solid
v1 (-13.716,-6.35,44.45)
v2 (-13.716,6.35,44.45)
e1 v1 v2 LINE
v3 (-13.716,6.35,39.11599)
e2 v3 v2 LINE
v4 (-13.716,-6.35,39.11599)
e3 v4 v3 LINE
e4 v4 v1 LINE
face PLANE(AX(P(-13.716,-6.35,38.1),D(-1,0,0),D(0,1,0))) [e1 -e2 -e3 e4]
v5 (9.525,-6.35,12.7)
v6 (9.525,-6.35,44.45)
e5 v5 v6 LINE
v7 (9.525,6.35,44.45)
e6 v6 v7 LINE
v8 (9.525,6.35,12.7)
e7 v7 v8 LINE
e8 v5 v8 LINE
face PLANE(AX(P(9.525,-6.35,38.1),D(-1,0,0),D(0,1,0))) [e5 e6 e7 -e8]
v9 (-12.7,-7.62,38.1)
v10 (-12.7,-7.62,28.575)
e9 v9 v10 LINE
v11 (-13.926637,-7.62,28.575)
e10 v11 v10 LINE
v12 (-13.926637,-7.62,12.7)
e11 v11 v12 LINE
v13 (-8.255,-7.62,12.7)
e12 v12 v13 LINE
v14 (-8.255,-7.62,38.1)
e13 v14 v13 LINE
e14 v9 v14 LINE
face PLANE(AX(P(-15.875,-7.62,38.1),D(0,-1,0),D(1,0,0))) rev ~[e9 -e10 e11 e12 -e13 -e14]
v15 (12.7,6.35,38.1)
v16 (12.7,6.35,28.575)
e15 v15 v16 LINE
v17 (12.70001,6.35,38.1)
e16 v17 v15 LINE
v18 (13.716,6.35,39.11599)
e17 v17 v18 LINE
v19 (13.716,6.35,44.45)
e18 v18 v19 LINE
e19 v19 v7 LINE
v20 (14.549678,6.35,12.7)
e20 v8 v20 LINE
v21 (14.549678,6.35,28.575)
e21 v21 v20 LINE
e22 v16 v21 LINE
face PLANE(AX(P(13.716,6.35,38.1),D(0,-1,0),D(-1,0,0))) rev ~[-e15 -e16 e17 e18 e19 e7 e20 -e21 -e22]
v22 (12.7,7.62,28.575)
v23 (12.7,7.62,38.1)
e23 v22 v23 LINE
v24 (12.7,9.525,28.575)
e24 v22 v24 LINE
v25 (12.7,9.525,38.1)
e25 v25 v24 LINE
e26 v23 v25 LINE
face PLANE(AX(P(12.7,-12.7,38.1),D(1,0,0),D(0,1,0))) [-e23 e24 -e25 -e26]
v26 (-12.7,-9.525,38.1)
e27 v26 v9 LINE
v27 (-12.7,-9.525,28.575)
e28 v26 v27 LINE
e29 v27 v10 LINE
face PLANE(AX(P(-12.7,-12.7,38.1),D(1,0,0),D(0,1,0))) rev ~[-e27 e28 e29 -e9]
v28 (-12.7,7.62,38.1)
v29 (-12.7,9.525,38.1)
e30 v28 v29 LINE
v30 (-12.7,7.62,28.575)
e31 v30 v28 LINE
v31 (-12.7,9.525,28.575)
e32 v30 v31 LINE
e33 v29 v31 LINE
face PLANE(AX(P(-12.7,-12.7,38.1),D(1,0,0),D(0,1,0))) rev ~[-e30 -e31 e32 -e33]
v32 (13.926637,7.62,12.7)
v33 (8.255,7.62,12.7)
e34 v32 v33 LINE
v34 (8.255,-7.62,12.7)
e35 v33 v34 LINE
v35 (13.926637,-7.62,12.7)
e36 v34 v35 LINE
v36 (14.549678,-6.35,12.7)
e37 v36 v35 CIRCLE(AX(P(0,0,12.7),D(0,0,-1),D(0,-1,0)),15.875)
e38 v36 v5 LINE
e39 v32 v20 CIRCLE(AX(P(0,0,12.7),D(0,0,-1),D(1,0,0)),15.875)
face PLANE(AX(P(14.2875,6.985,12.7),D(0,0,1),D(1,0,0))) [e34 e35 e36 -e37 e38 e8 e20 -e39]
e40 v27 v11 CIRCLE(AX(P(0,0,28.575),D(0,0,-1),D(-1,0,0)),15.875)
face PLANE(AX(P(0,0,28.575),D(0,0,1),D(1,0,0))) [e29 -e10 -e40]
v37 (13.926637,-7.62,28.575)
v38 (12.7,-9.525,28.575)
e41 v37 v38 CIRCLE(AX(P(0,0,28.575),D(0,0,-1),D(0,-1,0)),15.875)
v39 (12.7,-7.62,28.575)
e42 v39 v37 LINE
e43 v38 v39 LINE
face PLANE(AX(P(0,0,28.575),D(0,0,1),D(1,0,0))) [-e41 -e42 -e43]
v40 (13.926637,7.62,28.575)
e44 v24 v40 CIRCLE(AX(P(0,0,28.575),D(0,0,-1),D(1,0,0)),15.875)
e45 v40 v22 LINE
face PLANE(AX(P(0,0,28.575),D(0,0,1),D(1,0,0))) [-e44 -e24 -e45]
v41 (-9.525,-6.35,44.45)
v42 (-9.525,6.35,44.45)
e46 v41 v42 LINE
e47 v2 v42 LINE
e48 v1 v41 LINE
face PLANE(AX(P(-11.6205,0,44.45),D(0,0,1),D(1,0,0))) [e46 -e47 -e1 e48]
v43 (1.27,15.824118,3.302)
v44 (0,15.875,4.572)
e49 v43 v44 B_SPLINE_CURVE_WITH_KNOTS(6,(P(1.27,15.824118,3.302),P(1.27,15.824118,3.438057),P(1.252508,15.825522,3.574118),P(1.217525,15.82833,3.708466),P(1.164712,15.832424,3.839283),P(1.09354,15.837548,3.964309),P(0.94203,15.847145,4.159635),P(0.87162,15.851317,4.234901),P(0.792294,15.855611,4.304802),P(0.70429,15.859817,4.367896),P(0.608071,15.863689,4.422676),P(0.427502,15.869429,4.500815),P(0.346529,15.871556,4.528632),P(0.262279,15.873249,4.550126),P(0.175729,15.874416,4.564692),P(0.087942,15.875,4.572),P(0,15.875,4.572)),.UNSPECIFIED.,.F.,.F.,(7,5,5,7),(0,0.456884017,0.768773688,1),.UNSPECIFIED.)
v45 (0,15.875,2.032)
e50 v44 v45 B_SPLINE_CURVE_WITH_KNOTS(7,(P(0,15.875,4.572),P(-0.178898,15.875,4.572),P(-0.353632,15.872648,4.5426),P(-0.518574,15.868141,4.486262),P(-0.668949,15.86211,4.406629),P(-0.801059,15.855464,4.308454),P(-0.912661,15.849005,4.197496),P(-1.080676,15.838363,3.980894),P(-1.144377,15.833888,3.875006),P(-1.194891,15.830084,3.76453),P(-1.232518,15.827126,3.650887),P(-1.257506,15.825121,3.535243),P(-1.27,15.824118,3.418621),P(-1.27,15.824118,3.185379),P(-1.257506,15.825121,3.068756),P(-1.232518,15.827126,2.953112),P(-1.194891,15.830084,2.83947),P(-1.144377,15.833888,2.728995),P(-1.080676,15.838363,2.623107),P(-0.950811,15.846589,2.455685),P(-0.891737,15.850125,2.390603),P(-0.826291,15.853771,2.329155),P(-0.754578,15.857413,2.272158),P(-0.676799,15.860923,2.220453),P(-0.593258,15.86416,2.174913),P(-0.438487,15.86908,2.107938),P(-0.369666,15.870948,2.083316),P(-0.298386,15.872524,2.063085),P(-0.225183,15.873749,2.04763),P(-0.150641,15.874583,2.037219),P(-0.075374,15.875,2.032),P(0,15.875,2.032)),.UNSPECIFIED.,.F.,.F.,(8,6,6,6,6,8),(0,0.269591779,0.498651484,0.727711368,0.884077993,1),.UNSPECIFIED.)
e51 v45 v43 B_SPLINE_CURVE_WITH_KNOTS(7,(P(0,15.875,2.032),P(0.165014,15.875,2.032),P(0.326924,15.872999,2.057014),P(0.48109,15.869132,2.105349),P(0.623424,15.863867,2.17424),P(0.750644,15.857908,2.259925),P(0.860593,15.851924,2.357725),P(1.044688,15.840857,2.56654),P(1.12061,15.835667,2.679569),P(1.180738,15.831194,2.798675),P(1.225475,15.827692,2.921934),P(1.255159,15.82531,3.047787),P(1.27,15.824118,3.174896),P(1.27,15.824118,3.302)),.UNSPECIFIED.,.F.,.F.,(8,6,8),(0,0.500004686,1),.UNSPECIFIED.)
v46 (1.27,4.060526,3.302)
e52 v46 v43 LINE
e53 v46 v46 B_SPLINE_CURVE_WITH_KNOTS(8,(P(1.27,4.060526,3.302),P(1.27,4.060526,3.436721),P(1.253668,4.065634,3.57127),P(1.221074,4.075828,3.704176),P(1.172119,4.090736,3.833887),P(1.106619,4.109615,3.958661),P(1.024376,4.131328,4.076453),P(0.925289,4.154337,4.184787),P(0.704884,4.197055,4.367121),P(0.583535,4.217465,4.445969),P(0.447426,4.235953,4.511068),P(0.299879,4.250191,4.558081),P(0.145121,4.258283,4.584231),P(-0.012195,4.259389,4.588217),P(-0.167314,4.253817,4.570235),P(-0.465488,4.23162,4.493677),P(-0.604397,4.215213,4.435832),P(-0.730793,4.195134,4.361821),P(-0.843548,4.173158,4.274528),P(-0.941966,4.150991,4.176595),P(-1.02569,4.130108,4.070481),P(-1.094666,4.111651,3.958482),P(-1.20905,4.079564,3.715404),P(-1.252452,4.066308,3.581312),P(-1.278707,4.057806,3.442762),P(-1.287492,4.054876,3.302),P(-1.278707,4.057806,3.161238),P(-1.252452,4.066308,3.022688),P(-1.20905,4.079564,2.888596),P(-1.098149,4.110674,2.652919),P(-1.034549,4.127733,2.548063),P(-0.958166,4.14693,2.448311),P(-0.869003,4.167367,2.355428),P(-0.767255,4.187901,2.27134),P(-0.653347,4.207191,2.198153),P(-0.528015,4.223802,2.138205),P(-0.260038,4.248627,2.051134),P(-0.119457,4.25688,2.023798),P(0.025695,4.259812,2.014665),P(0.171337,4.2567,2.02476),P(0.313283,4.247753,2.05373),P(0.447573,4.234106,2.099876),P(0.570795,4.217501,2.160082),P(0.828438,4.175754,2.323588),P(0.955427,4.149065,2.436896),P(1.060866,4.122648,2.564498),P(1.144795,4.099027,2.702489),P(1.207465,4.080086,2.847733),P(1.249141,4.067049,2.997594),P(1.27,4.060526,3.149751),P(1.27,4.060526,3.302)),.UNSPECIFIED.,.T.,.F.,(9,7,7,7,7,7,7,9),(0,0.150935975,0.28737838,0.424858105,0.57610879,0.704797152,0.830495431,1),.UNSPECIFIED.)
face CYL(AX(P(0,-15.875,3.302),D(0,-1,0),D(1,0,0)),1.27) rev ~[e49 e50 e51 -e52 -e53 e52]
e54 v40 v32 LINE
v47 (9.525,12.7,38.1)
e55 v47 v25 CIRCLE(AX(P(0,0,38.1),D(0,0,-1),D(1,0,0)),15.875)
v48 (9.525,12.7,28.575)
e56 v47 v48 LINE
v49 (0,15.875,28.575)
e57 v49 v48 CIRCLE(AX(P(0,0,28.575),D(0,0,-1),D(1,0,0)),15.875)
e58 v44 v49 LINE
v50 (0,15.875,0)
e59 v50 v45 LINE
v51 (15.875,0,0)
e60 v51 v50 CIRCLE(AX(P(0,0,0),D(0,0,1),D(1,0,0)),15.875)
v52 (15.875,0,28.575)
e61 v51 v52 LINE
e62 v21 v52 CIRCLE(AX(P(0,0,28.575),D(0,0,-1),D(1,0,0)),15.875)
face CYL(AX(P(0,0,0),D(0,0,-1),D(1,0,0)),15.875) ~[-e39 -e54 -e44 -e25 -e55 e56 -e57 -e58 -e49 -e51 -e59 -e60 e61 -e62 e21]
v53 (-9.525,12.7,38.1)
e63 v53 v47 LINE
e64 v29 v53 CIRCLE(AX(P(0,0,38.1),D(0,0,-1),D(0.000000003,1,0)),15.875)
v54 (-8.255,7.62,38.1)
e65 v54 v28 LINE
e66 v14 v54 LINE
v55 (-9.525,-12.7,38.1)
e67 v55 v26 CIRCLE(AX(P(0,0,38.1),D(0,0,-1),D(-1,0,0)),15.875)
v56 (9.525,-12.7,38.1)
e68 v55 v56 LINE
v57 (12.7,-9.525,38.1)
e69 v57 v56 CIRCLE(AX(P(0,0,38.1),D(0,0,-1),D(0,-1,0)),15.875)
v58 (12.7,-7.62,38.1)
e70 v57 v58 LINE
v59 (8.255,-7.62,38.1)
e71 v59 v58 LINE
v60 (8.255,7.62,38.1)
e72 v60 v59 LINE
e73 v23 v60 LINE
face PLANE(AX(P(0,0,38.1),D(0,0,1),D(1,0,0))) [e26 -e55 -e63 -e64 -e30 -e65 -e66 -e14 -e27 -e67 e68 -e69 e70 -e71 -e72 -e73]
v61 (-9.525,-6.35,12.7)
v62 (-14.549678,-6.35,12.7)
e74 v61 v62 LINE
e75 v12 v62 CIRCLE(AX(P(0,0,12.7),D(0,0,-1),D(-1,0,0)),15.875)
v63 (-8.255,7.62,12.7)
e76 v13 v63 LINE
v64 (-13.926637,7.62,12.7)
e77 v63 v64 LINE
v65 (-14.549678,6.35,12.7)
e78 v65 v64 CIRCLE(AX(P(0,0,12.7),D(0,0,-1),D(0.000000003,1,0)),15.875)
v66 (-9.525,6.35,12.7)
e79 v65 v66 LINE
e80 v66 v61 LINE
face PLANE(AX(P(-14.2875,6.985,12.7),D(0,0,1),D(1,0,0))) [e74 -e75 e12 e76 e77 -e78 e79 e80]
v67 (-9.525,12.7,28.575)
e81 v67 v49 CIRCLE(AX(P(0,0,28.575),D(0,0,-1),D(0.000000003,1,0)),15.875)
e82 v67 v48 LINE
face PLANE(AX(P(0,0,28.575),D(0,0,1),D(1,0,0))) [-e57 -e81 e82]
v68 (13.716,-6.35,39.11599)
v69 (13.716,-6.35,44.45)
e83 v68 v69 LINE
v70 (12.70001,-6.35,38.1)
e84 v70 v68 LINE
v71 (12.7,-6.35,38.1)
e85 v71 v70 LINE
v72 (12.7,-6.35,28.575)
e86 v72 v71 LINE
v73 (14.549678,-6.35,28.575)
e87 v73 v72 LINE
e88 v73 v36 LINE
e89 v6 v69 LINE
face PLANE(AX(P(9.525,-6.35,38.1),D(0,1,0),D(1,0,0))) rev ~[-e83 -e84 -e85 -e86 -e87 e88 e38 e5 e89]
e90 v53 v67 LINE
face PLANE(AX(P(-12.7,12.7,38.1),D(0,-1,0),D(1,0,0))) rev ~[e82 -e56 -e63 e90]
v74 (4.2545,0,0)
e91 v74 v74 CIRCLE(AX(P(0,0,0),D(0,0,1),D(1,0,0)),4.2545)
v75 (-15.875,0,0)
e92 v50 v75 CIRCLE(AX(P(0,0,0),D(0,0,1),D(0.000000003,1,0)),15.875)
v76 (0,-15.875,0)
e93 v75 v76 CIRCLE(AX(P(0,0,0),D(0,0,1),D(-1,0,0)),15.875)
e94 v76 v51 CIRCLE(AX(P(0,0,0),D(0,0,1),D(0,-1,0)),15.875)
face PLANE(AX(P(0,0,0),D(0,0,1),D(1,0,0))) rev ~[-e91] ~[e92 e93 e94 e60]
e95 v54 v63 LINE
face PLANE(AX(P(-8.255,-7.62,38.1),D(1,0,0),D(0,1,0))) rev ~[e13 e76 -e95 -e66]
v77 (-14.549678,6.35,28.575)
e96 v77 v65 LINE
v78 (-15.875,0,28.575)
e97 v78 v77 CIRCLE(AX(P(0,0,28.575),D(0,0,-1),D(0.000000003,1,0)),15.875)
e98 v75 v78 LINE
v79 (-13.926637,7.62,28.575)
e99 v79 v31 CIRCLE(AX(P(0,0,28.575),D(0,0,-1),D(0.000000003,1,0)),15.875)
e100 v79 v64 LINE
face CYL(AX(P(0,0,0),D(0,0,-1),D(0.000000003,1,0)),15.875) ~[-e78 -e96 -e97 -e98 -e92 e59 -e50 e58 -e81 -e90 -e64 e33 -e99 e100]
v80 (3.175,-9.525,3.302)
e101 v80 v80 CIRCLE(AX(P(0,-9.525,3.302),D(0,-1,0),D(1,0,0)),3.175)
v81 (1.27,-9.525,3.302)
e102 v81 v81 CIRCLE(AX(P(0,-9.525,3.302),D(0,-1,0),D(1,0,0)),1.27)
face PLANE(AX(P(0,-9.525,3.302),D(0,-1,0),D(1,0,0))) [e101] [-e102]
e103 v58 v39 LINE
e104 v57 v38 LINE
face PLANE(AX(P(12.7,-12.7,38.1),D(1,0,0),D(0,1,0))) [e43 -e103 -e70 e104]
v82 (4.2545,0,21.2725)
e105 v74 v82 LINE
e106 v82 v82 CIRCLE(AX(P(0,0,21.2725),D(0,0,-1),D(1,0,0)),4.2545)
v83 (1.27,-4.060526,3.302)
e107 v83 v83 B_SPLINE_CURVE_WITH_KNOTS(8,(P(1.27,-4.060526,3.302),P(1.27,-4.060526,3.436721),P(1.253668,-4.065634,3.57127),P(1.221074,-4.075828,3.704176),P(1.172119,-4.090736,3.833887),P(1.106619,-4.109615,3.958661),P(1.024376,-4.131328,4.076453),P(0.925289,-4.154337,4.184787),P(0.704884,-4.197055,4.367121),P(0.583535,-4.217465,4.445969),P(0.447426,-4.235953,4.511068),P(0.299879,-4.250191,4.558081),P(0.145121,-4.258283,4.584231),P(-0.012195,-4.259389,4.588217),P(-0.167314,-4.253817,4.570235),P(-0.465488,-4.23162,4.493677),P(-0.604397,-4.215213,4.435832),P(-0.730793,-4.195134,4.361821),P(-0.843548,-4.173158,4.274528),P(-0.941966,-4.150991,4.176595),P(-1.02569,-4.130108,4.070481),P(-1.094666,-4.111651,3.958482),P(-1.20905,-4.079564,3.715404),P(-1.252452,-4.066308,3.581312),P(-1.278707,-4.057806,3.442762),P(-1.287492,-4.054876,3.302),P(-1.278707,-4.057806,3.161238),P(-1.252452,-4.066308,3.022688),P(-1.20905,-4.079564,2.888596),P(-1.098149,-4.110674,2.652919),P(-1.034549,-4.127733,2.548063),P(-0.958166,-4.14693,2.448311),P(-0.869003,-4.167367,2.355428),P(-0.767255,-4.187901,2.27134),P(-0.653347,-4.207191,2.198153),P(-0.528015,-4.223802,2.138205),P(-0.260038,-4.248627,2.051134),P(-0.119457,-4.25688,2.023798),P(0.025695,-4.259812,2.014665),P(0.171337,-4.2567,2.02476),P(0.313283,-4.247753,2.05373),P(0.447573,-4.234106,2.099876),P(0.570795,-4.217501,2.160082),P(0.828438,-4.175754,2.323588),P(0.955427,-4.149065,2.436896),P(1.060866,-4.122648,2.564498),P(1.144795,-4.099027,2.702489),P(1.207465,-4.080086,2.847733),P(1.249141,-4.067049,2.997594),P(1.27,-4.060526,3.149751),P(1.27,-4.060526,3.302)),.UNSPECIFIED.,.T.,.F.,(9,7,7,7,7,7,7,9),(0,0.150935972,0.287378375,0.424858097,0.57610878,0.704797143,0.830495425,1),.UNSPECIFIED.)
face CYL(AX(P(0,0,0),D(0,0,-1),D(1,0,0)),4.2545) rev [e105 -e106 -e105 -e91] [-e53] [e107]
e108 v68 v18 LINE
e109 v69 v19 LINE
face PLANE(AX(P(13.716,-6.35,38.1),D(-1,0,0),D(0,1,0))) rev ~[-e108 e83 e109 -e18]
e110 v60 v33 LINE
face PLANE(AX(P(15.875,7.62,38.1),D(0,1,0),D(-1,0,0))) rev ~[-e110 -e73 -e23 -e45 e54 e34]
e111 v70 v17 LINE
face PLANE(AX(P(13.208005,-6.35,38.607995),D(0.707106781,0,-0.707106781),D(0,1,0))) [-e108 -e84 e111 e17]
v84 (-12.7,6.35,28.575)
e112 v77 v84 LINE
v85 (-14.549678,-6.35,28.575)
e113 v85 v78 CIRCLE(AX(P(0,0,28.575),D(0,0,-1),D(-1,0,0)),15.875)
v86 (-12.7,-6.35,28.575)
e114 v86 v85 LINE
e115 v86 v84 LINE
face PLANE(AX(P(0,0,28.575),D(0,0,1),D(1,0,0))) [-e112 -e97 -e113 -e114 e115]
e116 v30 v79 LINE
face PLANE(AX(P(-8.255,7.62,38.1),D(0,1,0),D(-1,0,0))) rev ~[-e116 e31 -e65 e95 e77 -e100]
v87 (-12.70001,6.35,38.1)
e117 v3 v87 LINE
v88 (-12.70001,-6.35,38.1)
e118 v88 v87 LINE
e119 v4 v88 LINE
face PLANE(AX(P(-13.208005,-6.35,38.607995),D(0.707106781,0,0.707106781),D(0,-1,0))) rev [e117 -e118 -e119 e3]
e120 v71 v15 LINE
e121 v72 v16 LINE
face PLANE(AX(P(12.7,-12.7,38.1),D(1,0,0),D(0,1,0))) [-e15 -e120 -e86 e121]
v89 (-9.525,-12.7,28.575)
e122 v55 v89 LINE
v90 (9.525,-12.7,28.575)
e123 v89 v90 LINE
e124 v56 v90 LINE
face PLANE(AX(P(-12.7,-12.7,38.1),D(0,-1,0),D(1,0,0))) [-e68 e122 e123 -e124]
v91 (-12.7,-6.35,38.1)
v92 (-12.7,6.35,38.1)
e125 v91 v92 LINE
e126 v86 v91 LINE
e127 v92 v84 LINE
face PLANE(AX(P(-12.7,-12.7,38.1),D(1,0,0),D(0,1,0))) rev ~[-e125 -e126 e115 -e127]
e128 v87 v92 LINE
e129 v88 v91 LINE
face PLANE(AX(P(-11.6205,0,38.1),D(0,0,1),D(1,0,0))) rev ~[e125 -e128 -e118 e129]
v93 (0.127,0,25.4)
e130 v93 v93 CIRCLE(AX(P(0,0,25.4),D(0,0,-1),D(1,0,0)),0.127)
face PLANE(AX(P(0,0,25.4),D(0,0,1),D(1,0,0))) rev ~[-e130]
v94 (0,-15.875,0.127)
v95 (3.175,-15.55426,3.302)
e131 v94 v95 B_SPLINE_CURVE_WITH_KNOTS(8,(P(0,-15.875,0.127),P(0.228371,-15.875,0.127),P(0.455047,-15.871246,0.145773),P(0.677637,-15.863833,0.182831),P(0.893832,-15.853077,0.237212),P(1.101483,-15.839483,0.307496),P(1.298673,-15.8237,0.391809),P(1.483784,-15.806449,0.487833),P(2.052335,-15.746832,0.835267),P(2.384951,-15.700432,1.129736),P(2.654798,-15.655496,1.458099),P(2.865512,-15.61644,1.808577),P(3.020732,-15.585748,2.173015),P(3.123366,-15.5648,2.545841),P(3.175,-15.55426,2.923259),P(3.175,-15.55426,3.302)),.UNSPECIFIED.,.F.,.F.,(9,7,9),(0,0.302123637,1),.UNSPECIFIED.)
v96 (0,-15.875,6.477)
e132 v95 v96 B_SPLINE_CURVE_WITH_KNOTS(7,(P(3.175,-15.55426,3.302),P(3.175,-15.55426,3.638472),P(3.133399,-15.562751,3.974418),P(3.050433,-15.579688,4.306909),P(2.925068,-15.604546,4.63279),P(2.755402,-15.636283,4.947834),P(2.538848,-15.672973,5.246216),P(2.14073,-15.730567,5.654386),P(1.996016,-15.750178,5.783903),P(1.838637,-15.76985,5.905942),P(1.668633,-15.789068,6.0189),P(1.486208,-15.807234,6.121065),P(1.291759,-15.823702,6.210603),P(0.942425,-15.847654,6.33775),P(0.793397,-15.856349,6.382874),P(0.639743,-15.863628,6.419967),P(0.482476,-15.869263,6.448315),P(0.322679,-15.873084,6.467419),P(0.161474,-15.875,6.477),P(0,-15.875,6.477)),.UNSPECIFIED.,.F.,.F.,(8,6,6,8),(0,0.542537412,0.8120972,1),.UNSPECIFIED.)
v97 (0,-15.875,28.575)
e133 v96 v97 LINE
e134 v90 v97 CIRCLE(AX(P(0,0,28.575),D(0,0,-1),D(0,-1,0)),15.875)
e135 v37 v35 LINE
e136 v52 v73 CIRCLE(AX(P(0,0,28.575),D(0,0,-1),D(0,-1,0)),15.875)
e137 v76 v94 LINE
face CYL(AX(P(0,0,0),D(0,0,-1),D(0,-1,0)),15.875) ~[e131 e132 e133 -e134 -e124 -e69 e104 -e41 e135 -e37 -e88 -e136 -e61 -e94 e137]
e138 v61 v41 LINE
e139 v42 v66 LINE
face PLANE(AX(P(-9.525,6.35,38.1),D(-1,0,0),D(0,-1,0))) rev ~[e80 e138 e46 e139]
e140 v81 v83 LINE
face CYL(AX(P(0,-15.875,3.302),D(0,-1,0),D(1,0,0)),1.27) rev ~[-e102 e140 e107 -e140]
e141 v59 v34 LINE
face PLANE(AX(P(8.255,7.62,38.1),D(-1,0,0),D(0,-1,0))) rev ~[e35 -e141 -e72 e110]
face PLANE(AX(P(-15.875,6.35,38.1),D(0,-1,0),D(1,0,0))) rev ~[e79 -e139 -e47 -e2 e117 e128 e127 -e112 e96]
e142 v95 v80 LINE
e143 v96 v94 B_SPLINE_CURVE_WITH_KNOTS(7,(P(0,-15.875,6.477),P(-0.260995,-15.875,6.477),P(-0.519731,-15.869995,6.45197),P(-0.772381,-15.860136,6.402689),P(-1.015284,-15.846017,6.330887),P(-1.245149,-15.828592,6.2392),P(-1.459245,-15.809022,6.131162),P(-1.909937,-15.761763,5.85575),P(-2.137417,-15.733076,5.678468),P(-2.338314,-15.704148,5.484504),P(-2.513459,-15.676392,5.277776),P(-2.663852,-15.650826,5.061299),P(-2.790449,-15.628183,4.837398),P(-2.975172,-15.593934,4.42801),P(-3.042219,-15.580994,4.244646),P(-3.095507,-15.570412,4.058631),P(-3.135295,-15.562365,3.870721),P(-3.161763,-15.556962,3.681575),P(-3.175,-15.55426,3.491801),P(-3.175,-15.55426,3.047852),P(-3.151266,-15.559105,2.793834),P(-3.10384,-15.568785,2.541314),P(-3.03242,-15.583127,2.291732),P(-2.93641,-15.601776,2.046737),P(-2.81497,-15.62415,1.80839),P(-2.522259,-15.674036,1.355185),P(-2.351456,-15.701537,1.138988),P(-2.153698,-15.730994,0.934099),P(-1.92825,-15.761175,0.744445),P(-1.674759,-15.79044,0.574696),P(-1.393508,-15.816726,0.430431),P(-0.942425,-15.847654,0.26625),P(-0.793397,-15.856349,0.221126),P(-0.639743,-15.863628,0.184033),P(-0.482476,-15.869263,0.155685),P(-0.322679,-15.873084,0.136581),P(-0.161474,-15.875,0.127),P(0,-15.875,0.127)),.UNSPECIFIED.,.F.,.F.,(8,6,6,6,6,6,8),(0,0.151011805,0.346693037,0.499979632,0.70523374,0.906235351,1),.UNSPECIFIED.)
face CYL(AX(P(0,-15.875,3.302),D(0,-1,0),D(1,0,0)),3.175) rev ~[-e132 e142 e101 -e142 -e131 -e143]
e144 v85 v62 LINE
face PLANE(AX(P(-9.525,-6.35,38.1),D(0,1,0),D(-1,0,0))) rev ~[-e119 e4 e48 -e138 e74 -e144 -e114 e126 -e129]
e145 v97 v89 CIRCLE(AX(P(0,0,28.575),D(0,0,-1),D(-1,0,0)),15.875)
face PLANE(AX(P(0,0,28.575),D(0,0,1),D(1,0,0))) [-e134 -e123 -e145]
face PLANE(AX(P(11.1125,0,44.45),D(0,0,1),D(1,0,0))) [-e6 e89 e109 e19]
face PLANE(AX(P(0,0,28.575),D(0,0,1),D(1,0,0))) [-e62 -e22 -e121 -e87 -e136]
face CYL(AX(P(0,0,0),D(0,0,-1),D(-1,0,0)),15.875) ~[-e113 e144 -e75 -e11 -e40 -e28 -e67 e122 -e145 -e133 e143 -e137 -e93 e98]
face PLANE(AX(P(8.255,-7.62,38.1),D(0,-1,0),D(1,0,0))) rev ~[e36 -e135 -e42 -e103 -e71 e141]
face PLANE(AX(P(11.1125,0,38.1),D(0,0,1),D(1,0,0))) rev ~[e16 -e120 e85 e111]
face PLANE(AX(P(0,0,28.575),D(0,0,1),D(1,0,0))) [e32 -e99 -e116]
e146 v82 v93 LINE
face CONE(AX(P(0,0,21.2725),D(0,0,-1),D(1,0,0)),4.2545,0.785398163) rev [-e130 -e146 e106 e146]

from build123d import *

# Parameters (mm, degrees)
F0_W      = 31.75
F0_H      = 31.75
F0_R      = 4.2545
F1_DEPTH  = 38.1
F2_R      = 1.27
F3_DEPTH  = 76.2
F2_R_2    = 3.175
F4_DEPTH  = 6.35
F6_W      = 31.75
F6_H      = 31.75
F6_W_2    = 25.4
F6_H_2    = 25.4
F7_DEPTH  = 9.525
F8_DEPTH  = 101.6
F9_W      = 3.175
F9_H      = 1.27
F9_W_2    = 1.27
F9_H_2    = 12.7
F10_DEPTH = 25.4
F11_W     = 3.175
F11_H     = 12.7
F11_W_2   = 1.016
F11_W_3   = 4.191
F12_DEPTH = 6.35
F13_SIZE  = 1.01599
F14_W     = 12.7
F14_H     = 12.7
F14_R     = 4.2545
F15_DEPTH = 12.7
F16_SIZE  = 4.1275


# Not quite as in the source:
# - a fillet or chamfer is up to 0.001 mm smaller than in the source, because OpenCascade refuses the exact size


with BuildPart() as f1:
    # F0 (on Top) → F1 (new body)
    with BuildSketch(Plane.XY):
        Rectangle(F0_W, F0_H)
        Circle(F0_R, mode=Mode.SUBTRACT)
    extrude(amount=F1_DEPTH)

    # F2 (on face) → F3 (cut)
    with BuildSketch(Plane.XZ.offset(15.875)):
        with Locations((0, 3.302)):
            Circle(F2_R)
    extrude(amount=-F3_DEPTH, mode=Mode.SUBTRACT)

    # F2 (on face) → F4 (cut)
    with BuildSketch(Plane.XZ.offset(15.875)):
        with Locations((0, 3.302)):
            Circle(F2_R_2)
        with Locations((0, 3.302)):
            Circle(F2_R, mode=Mode.SUBTRACT)
    extrude(amount=-F4_DEPTH, mode=Mode.SUBTRACT)

    # F6 (on face) → F7 (cut)
    with BuildSketch(Plane.XY.offset(38.1)):
        Rectangle(F6_W, F6_H)
        Rectangle(F6_W_2, F6_H_2, mode=Mode.SUBTRACT)
    extrude(amount=-F7_DEPTH, mode=Mode.SUBTRACT)

    # F5 (on face) → F8 (cut)
    with BuildSketch(Plane(origin=(0, 0, 0), x_dir=(1, 0, 0), z_dir=(0, 0, -1))):
        with BuildLine():
            Line((15.875, -15.875), (15.875, 0))
            ThreePointArc((15.875, 0), (11.2253201706, -11.2253201321), (5.44e-08, -15.875))
            Line((5.44e-08, -15.875), (15.875, -15.875))
        make_face()
        with BuildLine():
            Line((-15.875, -15.875), (5.44e-08, -15.875))
            ThreePointArc((5.44e-08, -15.875), (-11.2253201321, -11.2253201706), (-15.875, 0))
            Line((-15.875, 0), (-15.875, -15.875))
        make_face()
        with BuildLine():
            ThreePointArc((-15.875, 0), (-11.2253201513, 11.2253201513), (0, 15.875))
            Line((0, 15.875), (-15.875, 15.875))
            Line((-15.875, 15.875), (-15.875, 0))
        make_face()
        with BuildLine():
            ThreePointArc((0, 15.875), (11.2253201513, 11.2253201513), (15.875, 0))
            Line((15.875, 0), (15.875, 15.875))
            Line((15.875, 15.875), (0, 15.875))
        make_face()
    extrude(amount=-F8_DEPTH, mode=Mode.SUBTRACT)

    # F9 (on face) → F10 (cut)
    with BuildSketch(Plane.XY.offset(38.1)):
        with Locations((-14.2875, 6.985)):
            Rectangle(F9_W, F9_H)
        with Locations((-11.1125, 6.985)):
            Rectangle(F9_W, F9_H)
        with Locations((-8.89, 6.985)):
            Rectangle(F9_W_2, F9_H)
        with Locations((-8.89, 0)):
            Rectangle(F9_W_2, F9_H_2)
        with Locations((-8.89, -6.985)):
            Rectangle(F9_W_2, F9_H)
        with Locations((-11.1125, -6.985)):
            Rectangle(F9_W, F9_H)
        with Locations((-14.2875, -6.985)):
            Rectangle(F9_W, F9_H)
        with Locations((14.2875, 6.985)):
            Rectangle(F9_W, F9_H)
        with Locations((11.1125, 6.985)):
            Rectangle(F9_W, F9_H)
        with Locations((8.89, 6.985)):
            Rectangle(F9_W_2, F9_H)
        with Locations((8.89, 0)):
            Rectangle(F9_W_2, F9_H_2)
        with Locations((8.89, -6.985)):
            Rectangle(F9_W_2, F9_H)
        with Locations((11.1125, -6.985)):
            Rectangle(F9_W, F9_H)
        with Locations((14.2875, -6.985)):
            Rectangle(F9_W, F9_H)
    extrude(amount=-F10_DEPTH, mode=Mode.SUBTRACT)

    # F11 (on face) → F12 (join)
    with BuildSketch(Plane.XY.offset(38.1)):
        with Locations((11.1125, 0)):
            Rectangle(F11_W, F11_H)
        with Locations((13.208, 0)):
            Rectangle(F11_W_2, F11_H)
        with Locations((-11.6205, 0)):
            Rectangle(F11_W_3, F11_H)
    extrude(amount=F12_DEPTH)

    # F13 (size 1.016 in the source; OpenCascade refuses exactly that, so slightly less here)
    f13_edges = [f1.edges().sort_by_distance(p)[0] for p in [
        (13.716, 0, 38.1),
        (-13.716, 0, 38.1),
    ]]
    chamfer(f13_edges, length=F13_SIZE)

    # F14 (on face) → F15 (join)
    with BuildSketch(Plane.XY.offset(38.1)):
        Rectangle(F14_W, F14_H)
        Circle(F14_R, mode=Mode.SUBTRACT)
        Circle(F14_R)
    extrude(amount=-F15_DEPTH)

    # F16
    f16_edges = [f1.edges().sort_by_distance(p)[0] for p in [
        (-4.2545, 0, 25.4),
    ]]
    chamfer(f16_edges, length=F16_SIZE)


solid = f1.part
